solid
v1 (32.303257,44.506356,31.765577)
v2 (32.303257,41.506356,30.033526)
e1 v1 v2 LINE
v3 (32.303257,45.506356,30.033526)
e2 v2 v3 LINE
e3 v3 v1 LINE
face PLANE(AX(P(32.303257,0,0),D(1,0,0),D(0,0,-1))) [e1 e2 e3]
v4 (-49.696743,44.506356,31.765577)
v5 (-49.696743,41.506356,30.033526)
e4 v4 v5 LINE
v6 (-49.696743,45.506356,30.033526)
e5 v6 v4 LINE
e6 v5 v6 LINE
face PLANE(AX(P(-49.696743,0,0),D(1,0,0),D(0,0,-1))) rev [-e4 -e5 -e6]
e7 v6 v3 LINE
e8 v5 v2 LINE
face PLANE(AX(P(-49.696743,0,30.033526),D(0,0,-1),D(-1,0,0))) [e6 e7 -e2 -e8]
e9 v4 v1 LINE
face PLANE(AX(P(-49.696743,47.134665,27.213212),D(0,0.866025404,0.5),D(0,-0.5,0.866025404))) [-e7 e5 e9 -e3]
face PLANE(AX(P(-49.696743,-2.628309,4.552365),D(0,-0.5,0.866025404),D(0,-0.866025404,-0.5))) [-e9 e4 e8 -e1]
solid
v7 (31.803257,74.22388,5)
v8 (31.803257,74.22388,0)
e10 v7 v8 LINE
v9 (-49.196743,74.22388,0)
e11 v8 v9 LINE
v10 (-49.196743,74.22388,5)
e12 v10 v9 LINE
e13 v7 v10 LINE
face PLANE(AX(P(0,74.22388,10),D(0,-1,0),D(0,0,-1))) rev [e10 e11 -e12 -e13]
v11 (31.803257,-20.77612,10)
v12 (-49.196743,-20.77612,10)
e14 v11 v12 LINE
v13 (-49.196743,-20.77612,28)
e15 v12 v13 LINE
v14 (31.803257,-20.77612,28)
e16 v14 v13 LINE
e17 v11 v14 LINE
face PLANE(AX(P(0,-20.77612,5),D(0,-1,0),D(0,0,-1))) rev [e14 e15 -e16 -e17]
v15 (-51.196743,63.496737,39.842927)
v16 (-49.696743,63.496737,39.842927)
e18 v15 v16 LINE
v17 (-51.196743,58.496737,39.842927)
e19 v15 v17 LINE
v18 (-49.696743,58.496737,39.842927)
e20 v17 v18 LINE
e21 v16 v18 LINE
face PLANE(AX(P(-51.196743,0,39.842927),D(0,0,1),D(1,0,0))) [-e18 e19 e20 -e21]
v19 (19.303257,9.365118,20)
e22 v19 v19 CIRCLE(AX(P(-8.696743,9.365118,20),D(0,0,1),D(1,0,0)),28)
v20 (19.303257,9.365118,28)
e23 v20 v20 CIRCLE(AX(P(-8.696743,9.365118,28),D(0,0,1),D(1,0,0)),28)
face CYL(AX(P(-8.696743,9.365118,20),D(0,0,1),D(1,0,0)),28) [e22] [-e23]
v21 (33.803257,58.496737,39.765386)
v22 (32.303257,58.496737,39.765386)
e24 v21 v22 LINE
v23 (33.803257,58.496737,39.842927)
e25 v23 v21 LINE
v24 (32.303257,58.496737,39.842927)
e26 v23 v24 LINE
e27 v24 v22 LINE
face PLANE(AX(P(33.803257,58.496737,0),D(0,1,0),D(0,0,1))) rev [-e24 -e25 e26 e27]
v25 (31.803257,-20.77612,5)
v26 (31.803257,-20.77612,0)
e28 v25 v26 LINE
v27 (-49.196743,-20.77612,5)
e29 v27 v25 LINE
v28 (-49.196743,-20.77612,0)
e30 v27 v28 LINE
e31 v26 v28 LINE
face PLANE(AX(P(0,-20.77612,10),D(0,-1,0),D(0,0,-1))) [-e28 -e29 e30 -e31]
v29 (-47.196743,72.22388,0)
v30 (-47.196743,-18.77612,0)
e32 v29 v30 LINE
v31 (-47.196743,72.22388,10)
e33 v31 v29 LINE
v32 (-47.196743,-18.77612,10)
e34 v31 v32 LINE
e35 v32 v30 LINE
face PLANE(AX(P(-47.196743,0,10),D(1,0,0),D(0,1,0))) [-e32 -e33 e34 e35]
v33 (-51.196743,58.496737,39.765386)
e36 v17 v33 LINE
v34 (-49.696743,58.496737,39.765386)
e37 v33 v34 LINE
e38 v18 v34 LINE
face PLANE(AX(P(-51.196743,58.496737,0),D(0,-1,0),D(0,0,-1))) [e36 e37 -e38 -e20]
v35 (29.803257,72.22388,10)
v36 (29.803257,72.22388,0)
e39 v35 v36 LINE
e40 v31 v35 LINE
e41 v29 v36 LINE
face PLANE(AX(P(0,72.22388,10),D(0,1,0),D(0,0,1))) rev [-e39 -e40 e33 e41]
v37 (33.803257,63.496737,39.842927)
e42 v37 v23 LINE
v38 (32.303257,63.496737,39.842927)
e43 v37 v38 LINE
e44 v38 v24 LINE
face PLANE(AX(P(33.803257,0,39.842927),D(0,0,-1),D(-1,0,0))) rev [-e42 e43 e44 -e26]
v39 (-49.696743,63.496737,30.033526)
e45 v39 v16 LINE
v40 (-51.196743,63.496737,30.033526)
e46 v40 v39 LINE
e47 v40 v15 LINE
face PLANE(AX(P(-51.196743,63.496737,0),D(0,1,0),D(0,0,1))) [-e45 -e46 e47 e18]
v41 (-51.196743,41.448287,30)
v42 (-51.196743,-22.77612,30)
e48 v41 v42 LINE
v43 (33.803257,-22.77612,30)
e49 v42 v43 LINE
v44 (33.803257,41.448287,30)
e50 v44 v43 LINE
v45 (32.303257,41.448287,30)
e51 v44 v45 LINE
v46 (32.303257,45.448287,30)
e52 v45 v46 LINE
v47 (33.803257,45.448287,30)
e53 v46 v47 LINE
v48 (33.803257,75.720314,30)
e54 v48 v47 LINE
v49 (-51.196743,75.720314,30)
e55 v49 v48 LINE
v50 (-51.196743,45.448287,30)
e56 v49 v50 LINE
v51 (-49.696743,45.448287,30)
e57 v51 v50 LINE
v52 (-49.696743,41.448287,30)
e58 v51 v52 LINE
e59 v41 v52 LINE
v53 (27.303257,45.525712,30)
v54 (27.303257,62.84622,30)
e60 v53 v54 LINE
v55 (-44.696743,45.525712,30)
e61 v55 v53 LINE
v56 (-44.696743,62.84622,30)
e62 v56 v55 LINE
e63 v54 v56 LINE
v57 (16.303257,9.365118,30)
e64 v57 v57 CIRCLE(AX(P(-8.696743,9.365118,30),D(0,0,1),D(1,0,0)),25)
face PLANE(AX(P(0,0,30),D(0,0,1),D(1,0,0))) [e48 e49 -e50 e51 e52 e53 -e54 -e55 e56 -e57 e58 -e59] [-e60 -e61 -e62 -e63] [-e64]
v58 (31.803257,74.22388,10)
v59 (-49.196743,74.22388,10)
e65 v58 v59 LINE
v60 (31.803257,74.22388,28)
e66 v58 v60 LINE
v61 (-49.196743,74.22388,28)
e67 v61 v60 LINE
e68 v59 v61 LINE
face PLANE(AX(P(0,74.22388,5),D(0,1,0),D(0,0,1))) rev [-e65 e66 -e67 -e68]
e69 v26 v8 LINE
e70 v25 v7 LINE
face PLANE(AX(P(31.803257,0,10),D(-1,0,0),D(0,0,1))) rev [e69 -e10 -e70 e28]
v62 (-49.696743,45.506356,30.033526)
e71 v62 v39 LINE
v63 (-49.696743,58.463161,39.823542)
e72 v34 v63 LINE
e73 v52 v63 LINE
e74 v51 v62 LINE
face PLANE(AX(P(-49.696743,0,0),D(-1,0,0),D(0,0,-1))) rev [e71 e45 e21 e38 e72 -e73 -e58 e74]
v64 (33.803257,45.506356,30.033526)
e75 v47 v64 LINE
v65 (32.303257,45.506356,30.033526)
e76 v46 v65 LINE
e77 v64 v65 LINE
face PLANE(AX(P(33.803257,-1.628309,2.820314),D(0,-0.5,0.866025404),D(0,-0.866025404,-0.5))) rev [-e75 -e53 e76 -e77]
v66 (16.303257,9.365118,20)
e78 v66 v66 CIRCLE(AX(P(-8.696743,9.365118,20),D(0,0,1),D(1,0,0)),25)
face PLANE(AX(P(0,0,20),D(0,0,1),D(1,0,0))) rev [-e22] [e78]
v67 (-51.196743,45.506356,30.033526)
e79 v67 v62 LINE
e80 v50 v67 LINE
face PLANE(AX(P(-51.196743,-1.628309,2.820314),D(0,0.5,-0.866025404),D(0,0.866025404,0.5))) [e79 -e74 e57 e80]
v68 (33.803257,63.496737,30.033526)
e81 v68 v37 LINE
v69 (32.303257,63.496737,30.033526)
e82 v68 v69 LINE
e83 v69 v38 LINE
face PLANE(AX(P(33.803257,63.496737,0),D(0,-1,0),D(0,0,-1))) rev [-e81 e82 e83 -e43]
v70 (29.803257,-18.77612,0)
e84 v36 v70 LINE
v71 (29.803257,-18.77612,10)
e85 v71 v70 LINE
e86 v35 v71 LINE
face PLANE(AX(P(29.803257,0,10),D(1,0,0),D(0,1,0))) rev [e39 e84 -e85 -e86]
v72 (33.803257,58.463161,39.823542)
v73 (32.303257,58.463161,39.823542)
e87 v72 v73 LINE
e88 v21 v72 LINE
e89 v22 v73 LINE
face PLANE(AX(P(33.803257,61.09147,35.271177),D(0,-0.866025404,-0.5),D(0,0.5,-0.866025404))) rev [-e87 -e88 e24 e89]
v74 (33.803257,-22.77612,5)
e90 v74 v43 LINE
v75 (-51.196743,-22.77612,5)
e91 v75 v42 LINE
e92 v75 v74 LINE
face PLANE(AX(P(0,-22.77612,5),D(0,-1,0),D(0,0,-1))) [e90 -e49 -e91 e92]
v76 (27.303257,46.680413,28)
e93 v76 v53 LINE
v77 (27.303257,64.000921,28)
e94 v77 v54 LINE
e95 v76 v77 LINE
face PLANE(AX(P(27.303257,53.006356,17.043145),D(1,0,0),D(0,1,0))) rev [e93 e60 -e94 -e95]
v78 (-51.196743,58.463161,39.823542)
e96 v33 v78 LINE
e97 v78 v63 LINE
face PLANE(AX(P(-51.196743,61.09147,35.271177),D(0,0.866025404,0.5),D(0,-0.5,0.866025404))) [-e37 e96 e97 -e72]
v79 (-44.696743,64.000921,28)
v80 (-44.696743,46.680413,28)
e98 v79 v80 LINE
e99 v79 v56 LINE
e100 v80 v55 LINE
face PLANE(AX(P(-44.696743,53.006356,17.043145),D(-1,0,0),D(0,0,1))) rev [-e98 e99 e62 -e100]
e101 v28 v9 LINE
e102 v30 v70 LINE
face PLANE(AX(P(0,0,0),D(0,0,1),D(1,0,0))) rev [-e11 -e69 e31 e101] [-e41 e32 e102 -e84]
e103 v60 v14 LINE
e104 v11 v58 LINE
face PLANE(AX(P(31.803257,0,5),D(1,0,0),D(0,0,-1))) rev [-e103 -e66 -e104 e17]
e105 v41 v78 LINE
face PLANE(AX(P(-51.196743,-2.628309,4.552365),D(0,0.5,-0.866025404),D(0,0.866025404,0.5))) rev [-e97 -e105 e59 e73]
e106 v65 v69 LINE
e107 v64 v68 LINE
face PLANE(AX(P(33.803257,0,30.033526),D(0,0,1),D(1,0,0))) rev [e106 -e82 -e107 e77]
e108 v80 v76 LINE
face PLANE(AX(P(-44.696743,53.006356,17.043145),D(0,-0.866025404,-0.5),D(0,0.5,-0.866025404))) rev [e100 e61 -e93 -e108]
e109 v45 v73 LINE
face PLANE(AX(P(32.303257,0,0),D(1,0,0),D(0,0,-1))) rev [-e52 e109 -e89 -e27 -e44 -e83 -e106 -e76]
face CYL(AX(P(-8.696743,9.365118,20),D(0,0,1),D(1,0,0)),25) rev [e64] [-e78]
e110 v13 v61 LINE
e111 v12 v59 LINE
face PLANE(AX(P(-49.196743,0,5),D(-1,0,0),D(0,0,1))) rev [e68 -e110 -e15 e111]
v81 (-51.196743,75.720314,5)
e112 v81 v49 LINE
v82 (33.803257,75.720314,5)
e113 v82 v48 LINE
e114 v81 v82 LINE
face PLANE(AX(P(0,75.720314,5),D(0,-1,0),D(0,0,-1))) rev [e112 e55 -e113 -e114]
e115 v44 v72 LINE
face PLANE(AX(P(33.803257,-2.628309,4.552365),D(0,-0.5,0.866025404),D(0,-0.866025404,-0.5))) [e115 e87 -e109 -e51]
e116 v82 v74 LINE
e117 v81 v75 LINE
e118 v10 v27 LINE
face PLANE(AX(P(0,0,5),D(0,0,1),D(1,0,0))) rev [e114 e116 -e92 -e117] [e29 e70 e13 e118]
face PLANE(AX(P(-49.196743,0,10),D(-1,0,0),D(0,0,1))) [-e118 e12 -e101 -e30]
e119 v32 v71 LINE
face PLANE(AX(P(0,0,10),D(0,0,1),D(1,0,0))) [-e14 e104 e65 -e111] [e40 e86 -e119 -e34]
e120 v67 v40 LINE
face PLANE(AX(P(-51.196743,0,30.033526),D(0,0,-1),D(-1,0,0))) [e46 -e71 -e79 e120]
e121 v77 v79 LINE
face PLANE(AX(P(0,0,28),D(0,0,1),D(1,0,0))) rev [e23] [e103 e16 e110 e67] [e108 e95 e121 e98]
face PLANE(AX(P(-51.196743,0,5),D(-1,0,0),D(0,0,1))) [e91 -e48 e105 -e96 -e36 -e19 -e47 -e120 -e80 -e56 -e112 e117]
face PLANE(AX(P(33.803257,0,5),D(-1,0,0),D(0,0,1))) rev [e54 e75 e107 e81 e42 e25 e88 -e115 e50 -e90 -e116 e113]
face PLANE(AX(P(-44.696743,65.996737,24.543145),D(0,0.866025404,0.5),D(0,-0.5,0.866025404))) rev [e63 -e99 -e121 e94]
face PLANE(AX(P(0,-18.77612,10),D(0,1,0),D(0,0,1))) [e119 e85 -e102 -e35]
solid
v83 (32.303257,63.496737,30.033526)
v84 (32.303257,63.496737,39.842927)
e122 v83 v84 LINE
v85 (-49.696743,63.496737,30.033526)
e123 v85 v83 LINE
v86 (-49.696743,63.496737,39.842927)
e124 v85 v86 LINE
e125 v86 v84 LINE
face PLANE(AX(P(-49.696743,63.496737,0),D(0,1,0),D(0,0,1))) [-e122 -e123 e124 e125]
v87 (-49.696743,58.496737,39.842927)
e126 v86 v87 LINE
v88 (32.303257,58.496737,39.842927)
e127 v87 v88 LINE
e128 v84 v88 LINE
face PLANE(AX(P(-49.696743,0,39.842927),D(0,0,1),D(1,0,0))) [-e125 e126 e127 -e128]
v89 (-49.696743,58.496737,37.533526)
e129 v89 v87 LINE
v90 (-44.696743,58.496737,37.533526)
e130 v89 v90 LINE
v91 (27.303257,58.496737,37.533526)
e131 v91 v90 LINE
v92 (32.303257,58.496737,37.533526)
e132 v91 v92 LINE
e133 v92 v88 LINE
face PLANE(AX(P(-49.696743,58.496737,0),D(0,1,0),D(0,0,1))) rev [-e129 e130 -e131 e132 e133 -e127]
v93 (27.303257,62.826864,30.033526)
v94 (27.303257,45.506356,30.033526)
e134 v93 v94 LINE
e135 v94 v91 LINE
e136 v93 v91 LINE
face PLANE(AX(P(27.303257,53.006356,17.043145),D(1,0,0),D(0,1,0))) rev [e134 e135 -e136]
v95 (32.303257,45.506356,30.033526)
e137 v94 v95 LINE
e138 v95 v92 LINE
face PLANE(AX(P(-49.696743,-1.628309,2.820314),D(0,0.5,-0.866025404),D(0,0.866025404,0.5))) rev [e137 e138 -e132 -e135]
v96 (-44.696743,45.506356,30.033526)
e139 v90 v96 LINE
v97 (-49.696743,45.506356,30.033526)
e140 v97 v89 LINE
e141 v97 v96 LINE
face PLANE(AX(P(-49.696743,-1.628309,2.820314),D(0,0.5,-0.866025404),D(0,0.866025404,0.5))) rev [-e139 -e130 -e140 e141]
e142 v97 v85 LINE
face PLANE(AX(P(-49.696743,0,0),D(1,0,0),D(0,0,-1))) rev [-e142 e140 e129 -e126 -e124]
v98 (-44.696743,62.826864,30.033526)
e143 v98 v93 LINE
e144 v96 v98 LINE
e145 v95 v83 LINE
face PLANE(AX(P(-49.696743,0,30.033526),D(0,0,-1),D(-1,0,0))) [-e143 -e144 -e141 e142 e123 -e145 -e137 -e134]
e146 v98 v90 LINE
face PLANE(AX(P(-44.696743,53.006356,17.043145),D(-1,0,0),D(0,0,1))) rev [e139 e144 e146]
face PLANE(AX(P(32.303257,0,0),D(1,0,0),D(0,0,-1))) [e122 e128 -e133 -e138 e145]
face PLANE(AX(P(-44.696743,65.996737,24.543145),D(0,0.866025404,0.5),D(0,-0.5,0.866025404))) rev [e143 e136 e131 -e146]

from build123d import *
from build123d.topology import SkipClean

# Parameters (mm, degrees)
SKETCH1_W                  = 2
SKETCH1_H                  = 2
BOSS_EXTRUDE1_DEPTH        = 10
BOSS_EXTRUDE3_DEPTH        = 20
BOSS_EXTRUDE3_DEPTH_BACK   = 5
SKETCH2_W                  = 85
SKETCH2_H                  = 98.49643328
SKETCH2_W_2                = 81
SKETCH2_H_2                = 95
SKETCH3_W                  = 81
SKETCH3_H                  = 95
BOSS_EXTRUDE4_DEPTH        = 2
BOSS_EXTRUDE6_DEPTH        = 41
BOSS_EXTRUDE6_DEPTH_BACK   = 41
BOSS_EXTRUDE6_2_DEPTH      = 41
BOSS_EXTRUDE6_2_DEPTH_BACK = 41
BOSS_EXTRUDE7_DEPTH        = 1.5
SKETCH15_W                 = 72
SKETCH15_H                 = 15
CUT_EXTRUDE2_DEPTH         = 15
CUT_EXTRUDE3_DEPTH         = 10
BOSS_EXTRUDE8_DEPTH        = 10


# Read off the part's stored shape, not the designer's step: Boss-Extrude7
with BuildPart() as part:
    # Sketch1 → Boss-Extrude1 (new body)
    with BuildSketch(Plane.XY):
        Polygon((-49.196743418, -18.776119502), (-47.196743418, -18.776119502), (-47.196743418, 72.223880498), (-24.196743418, 72.223880498), (-22.196743418, 72.223880498), (29.803256582, 72.223880498), (29.803256582, 74.223880498), (-49.196743418, 74.223880498), align=None)
        Polygon((-24.196743418, -18.776119502), (-47.196743418, -18.776119502), (-47.196743418, -20.776119502), (31.803256582, -20.776119502), (31.803256582, 72.223880498), (29.803256582, 72.223880498), (29.803256582, -18.776119502), (-22.196743418, -18.776119502), align=None)
        with Locations((-48.196743418, -19.776119502)):
            Rectangle(SKETCH1_W, SKETCH1_H)
        with Locations((30.803256582, 73.223880498)):
            Rectangle(SKETCH1_W, SKETCH1_H)
    extrude(amount=BOSS_EXTRUDE1_DEPTH)

    # Sketch2 → Boss-Extrude3 (add, two sides: drawn at the far end of the back side and taken through both)
    with BuildSketch(Plane.XY.offset(10).offset(-BOSS_EXTRUDE3_DEPTH_BACK)):
        with Locations((-8.696743418, 26.472097138)):
            Rectangle(SKETCH2_W, SKETCH2_H)
        with Locations((-8.696743418, 26.723880498)):
            Rectangle(SKETCH2_W_2, SKETCH2_H_2, mode=Mode.SUBTRACT)
    extrude(amount=BOSS_EXTRUDE3_DEPTH + BOSS_EXTRUDE3_DEPTH_BACK)

    # Sketch3 → Boss-Extrude4 (add)
    with BuildSketch(Plane.XY.offset(30)):
        with Locations((-8.696743418, 26.723880498)):
            Rectangle(SKETCH3_W, SKETCH3_H)
    extrude(amount=-BOSS_EXTRUDE4_DEPTH)

    # Boss-Extrude7 outline → Boss-Extrude7 (add)
    with BuildSketch(Plane(origin=(32.303256582, 0, 0), x_dir=(0, 0, -1), z_dir=(1, 0, 0))):
        Polygon((-39.842927076, 63.496736875), (-39.842927076, 58.496736875), (-39.765386314, 58.496736875), (-39.823541886, 58.46316074), (-30, 41.448287084), (-30, 45.448287084), (-30.033525999, 45.506355818), (-30.033525999, 63.496736875), align=None)
    boss_extrude7 = extrude(amount=BOSS_EXTRUDE7_DEPTH)

    # Mirror2: Boss-Extrude7 across plane
    add(boss_extrude7.mirror(Plane(origin=(-8.696743418, 0, 0), x_dir=(0, 0, 1), z_dir=(1, 0, 0))))


with BuildPart() as body_2:
    # Sketch9 → Boss-Extrude6 (new, two sides: drawn at the far end of the back side and taken through both)
    with BuildSketch(Plane(origin=(-8.696743418, 0, 0), x_dir=(0, 0, -1), z_dir=(1, 0, 0)).offset(-BOSS_EXTRUDE6_DEPTH_BACK)):
        Polygon((-30.033525999, 45.506355818), (-30.033525999, 63.496736875), (-39.842927076, 63.496736875), (-39.842927076, 58.496736875), (-37.533525999, 58.496736875), align=None)
    extrude(amount=BOSS_EXTRUDE6_DEPTH + BOSS_EXTRUDE6_DEPTH_BACK)


with BuildPart() as body_3:
    # Sketch9 → Boss-Extrude6 2 (new, two sides: drawn at the far end of the back side and taken through both)
    with BuildSketch(Plane(origin=(-8.696743418, 0, 0), x_dir=(0, 0, -1), z_dir=(1, 0, 0)).offset(-BOSS_EXTRUDE6_2_DEPTH_BACK)):
        Polygon((-30.033525999, 41.506355818), (-30.033525999, 45.506355818), (-31.765576807, 44.506355818), align=None)
    extrude(amount=BOSS_EXTRUDE6_2_DEPTH + BOSS_EXTRUDE6_2_DEPTH_BACK)


with BuildPart() as cut_extrude2_tool:
    # Sketch15 → Cut-Extrude2 (new body)
    with BuildSketch(Plane(origin=(0, -1.628309286, 2.820314413), x_dir=(1, 0, 0), z_dir=(0, -0.5000000000000001, 0.8660254037844386))):
        with Locations((-8.696743418, 61.926423172)):
            Rectangle(SKETCH15_W, SKETCH15_H)
    extrude(amount=-CUT_EXTRUDE2_DEPTH)


with BuildPart() as part_1:
    add(part.part)

    # Cut-Extrude2: cut by cut_extrude2_tool
    add(cut_extrude2_tool.part, mode=Mode.SUBTRACT)

    # Sketch16 → Cut-Extrude3 (cut)
    with BuildSketch(Plane.XY.offset(30)):
        with BuildLine():
            ThreePointArc((-8.696743418, 34.365118158), (-33.696743418, 9.365118158), (-8.696743418, -15.634881842))
            Line((-8.696743418, -15.634881842), (-8.696743418, 34.365118158))
        make_face()
        with BuildLine():
            Line((-8.696743418, 34.365118158), (-8.696743418, -15.634881842))
            ThreePointArc((-8.696743418, -15.634881842), (8.980926112, -8.312551372), (16.303256582, 9.365118158))
            ThreePointArc((16.303256582, 9.365118158), (8.980926112, 27.042787688), (-8.696743418, 34.365118158))
        make_face()
    extrude(amount=-CUT_EXTRUDE3_DEPTH, mode=Mode.SUBTRACT)

    # Sketch16<3> → Boss-Extrude8 (add)
    with SkipClean():  # the faces are left unmerged after this step: merging them gives an invalid solid
        with BuildSketch(Plane.XY.offset(30)):
            with BuildLine():
                ThreePointArc((-8.696743418, 37.365118158), (-36.696743418, 9.365118158), (-8.696743418, -18.634881842))
                Line((-8.696743418, -18.634881842), (-8.696743418, -15.634881842))
                ThreePointArc((-8.696743418, -15.634881842), (-33.696743418, 9.365118158), (-8.696743418, 34.365118158))
                Line((-8.696743418, 34.365118158), (-8.696743418, 37.365118158))
            make_face()
            with BuildLine():
                Line((-8.696743418, -15.634881842), (-8.696743418, -18.634881842))
                ThreePointArc((-8.696743418, -18.634881842), (11.102246456, -10.433871715), (19.303256582, 9.365118158))
                ThreePointArc((19.303256582, 9.365118158), (11.102246456, 29.164108031), (-8.696743418, 37.365118158))
                Line((-8.696743418, 37.365118158), (-8.696743418, 34.365118158))
                ThreePointArc((-8.696743418, 34.365118158), (8.980926112, 27.042787688), (16.303256582, 9.365118158))
                ThreePointArc((16.303256582, 9.365118158), (8.980926112, -8.312551372), (-8.696743418, -15.634881842))
            make_face()
        extrude(amount=-BOSS_EXTRUDE8_DEPTH)


with BuildPart() as body_2_1:
    add(body_2.part)

    # Cut-Extrude2: cut by cut_extrude2_tool
    add(cut_extrude2_tool.part, mode=Mode.SUBTRACT)


solid = Compound([body_3.part, part_1.part, body_2_1.part])
